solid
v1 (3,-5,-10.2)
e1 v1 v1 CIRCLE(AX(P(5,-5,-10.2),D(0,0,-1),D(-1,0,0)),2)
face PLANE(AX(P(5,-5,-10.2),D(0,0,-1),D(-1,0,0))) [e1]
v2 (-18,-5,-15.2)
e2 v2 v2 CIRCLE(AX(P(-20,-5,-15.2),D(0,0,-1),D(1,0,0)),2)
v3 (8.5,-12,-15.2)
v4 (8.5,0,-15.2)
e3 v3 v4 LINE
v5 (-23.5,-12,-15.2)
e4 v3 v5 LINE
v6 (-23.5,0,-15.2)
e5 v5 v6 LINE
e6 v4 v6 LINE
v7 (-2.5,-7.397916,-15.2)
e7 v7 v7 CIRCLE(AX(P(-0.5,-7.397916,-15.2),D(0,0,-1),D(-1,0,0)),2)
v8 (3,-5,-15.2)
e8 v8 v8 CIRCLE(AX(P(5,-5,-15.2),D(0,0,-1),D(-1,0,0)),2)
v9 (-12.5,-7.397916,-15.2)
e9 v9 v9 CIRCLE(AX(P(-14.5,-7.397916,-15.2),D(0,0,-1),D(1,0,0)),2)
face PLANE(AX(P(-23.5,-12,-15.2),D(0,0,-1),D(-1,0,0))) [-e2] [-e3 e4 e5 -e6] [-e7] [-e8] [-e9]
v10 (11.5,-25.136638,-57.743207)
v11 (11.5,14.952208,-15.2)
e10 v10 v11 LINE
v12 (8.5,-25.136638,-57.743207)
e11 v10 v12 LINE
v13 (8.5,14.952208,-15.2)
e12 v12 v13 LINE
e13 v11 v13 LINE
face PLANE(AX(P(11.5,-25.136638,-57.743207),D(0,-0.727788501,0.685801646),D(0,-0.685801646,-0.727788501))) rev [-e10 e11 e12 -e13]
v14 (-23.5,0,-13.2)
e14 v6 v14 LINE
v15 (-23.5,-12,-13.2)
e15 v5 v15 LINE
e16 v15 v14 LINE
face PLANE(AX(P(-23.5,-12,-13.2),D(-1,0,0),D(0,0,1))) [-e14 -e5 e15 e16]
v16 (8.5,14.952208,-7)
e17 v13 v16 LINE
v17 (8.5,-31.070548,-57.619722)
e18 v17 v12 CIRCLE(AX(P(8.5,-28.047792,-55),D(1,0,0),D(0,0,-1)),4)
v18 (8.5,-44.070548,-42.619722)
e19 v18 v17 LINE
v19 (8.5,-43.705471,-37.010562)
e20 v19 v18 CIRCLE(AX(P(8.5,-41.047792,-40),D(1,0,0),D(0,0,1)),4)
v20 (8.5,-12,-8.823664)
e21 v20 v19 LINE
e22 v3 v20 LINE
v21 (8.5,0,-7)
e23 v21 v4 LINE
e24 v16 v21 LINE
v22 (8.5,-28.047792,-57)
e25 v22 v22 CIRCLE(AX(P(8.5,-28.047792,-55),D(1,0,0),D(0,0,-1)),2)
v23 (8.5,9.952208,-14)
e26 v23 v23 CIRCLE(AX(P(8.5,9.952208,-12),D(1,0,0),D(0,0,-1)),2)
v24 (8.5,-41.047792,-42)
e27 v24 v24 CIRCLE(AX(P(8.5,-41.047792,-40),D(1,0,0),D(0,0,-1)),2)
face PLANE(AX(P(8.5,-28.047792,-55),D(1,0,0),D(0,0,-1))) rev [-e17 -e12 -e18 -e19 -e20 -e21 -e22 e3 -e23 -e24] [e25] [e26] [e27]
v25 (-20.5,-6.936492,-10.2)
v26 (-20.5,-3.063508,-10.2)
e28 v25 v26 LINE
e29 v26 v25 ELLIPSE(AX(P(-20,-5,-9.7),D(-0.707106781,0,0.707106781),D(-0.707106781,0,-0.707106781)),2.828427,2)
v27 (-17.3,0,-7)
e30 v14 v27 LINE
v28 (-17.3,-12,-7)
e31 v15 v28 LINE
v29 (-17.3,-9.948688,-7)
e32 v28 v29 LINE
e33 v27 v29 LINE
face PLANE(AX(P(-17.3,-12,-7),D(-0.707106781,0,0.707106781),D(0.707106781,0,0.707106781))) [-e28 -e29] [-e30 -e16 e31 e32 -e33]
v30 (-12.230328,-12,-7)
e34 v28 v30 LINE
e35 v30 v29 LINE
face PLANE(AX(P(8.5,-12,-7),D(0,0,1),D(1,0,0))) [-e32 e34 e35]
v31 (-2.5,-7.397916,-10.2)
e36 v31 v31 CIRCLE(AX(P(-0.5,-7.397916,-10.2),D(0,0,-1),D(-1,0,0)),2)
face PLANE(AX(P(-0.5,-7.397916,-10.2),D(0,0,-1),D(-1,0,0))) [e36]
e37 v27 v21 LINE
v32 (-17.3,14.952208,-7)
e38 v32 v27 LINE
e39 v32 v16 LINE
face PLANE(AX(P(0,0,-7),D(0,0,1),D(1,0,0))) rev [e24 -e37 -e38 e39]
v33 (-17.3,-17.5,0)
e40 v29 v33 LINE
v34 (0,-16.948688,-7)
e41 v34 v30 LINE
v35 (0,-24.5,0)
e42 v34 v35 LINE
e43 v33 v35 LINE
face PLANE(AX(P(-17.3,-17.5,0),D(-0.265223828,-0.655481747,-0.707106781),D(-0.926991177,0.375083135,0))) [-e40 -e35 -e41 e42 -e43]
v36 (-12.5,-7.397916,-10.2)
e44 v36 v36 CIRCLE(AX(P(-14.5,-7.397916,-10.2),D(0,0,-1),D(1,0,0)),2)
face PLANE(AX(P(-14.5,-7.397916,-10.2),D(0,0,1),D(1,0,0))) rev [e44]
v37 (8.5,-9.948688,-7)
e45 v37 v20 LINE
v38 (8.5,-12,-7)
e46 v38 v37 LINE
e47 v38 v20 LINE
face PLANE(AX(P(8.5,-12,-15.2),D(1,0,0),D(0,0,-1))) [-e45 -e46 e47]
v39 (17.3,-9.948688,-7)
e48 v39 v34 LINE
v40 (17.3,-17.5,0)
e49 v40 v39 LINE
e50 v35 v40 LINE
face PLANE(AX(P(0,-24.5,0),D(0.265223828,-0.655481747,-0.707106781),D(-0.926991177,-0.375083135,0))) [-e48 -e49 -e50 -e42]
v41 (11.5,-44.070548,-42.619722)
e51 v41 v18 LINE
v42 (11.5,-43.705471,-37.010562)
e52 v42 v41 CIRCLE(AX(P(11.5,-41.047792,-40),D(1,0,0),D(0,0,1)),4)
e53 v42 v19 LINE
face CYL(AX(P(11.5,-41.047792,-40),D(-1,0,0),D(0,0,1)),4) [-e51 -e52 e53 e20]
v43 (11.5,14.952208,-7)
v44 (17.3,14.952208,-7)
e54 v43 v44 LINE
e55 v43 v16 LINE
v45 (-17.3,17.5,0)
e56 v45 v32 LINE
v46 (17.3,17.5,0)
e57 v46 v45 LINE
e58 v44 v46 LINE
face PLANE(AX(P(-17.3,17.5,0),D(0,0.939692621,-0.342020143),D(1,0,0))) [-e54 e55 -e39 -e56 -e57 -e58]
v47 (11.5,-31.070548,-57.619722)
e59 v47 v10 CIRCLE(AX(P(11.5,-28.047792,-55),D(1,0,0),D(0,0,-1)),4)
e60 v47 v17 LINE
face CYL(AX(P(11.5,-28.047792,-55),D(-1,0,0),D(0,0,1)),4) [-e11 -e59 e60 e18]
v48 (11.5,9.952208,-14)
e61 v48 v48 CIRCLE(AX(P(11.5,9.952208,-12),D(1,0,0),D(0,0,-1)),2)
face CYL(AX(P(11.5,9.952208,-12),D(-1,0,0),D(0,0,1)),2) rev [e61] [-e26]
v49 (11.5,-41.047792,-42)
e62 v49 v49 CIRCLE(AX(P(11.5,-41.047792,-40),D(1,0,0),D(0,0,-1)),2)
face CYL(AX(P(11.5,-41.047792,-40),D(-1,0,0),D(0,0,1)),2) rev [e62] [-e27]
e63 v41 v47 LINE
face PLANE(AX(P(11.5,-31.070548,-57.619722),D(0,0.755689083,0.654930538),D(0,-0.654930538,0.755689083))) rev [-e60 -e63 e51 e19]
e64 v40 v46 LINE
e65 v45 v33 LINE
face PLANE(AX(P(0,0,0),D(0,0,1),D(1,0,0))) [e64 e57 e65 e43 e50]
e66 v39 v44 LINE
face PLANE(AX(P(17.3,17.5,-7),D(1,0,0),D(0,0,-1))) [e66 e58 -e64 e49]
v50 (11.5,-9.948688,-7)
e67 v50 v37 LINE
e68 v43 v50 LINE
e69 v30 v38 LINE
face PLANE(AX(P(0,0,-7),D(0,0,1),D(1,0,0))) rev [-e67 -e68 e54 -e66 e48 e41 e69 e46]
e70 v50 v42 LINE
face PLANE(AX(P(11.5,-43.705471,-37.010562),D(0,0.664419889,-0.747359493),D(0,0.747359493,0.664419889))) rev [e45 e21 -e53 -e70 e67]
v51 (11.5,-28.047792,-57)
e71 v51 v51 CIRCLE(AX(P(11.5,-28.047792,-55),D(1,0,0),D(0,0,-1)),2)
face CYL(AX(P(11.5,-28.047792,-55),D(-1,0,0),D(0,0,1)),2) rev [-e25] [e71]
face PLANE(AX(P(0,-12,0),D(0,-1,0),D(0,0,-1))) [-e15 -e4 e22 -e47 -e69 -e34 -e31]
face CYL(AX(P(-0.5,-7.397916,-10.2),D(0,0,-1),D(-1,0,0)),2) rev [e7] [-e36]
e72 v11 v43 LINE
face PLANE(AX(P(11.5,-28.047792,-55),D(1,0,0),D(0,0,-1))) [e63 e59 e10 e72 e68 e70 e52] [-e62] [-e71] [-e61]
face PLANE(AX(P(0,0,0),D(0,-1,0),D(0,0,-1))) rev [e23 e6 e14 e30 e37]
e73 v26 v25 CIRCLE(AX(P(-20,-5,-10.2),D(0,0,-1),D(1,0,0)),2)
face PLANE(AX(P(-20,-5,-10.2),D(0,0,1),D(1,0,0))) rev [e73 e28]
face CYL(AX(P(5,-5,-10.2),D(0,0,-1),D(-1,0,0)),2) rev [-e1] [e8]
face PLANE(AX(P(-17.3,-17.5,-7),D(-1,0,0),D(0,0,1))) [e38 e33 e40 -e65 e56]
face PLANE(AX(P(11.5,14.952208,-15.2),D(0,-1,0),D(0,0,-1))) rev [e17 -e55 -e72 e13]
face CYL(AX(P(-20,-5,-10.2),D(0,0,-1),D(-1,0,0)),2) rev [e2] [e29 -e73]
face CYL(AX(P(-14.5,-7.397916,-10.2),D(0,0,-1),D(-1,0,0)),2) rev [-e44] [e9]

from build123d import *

# Parameters (mm, degrees)
RESSALTO_EXTRUS_O4_DEPTH = 7
CHANFRO1_SIZE            = 7
CHANFRO2_SIZE2           = 7
CHANFRO2_SIZE            = 2.54779164
RESSALTO_EXTRUS_O5_DEPTH = 12
ESBO_O13_R               = 2
CORTE_EXTRUS_O1_DEPTH    = 5
ESBO_O14_R               = 2
RESSALTO_EXTRUS_O6_DEPTH = 3


with BuildPart() as part:
    # Esboço10 → Ressalto-extrusão4 (new body)
    with BuildSketch(Plane.XY):
        Polygon((-17.3, -17.5), (0, -24.5), (17.3, -17.5), (17.3, 17.5), (-17.3, 17.5), align=None)
    extrude(amount=-RESSALTO_EXTRUS_O4_DEPTH)

    # Chanfro1
    chanfro1_edges = [part.edges().sort_by_distance(p)[0] for p in [
        (-8.65, -21, -7),
        (8.65, -21, -7),
    ]]
    chamfer(chanfro1_edges, length=CHANFRO1_SIZE - 0.0001)  # a hair under: the kernel refuses the full size

    # Chanfro2
    chanfro2_edges = [part.edges().sort_by_distance(p)[0] for p in [
        (0, 17.5, -7),
    ]]
    chanfro2_side = [part.faces().sort_by_distance(p)[0] for p in [
        (0, 17.449044167, -7),
    ]]
    chamfer(chanfro2_edges, length=CHANFRO2_SIZE - 0.0001, length2=CHANFRO2_SIZE2 - 0.0001, reference=chanfro2_side[0])  # a hair under: the kernel refuses the full size

    # Esboço12 → Ressalto-extrusão5 (add)
    with BuildSketch(Plane(origin=(0, 0, 0), x_dir=(1, 0, 0), z_dir=(0, 1, 0))):
        Polygon((-17.3, 7), (-23.5, 13.2), (-23.5, 15.2), (8.5, 15.2), (8.5, 7), align=None)
    extrude(amount=-RESSALTO_EXTRUS_O5_DEPTH)

    # Esboço13 → Corte-extrusão1 (cut)
    with BuildSketch(Plane(origin=(0, 0, -15.2), x_dir=(-1, 0, 0), z_dir=(0, 0, -1))):
        with Locations((0.5, -7.397915762)):
            Circle(ESBO_O13_R)
        with Locations((-5, -5)):
            Circle(ESBO_O13_R)
        with Locations(Location((20, -5, 0), (0, 0, 284.477512186))):
            Circle(ESBO_O13_R)
        with Locations(Location((14.5, -7.397915762, 0), (0, 0, 180))):
            Circle(ESBO_O13_R)
    extrude(amount=-CORTE_EXTRUS_O1_DEPTH, mode=Mode.SUBTRACT)

    # Esboço14 → Ressalto-extrusão6 (add)
    with BuildSketch(Plane(origin=(8.5, 0, 0), x_dir=(0, 0, -1), z_dir=(1, 0, 0))):
        with BuildLine():
            Line((57.743206586, -25.136637637), (15.2, 14.95220836))
            Line((15.2, 14.95220836), (7, 14.95220836))
            Line((7, 14.95220836), (7, -9.948687565))
            Line((7, -9.948687565), (37.010562028, -43.705471194))
            ThreePointArc((37.010562028, -43.705471194), (39.740206409, -45.039346135), (42.619722154, -44.070547971))
            Line((42.619722154, -44.070547971), (57.619722154, -31.070547971))
            ThreePointArc((57.619722154, -31.070547971), (58.999134172, -28.131013459), (57.743206586, -25.136637637))
        make_face()
        with Locations((12, 9.95220836)):
            Circle(ESBO_O14_R, mode=Mode.SUBTRACT)
        with Locations((55, -28.04779164)):
            Circle(ESBO_O14_R, mode=Mode.SUBTRACT)
        with Locations((40, -41.04779164)):
            Circle(ESBO_O14_R, mode=Mode.SUBTRACT)
    extrude(amount=RESSALTO_EXTRUS_O6_DEPTH)


solid = part.part
